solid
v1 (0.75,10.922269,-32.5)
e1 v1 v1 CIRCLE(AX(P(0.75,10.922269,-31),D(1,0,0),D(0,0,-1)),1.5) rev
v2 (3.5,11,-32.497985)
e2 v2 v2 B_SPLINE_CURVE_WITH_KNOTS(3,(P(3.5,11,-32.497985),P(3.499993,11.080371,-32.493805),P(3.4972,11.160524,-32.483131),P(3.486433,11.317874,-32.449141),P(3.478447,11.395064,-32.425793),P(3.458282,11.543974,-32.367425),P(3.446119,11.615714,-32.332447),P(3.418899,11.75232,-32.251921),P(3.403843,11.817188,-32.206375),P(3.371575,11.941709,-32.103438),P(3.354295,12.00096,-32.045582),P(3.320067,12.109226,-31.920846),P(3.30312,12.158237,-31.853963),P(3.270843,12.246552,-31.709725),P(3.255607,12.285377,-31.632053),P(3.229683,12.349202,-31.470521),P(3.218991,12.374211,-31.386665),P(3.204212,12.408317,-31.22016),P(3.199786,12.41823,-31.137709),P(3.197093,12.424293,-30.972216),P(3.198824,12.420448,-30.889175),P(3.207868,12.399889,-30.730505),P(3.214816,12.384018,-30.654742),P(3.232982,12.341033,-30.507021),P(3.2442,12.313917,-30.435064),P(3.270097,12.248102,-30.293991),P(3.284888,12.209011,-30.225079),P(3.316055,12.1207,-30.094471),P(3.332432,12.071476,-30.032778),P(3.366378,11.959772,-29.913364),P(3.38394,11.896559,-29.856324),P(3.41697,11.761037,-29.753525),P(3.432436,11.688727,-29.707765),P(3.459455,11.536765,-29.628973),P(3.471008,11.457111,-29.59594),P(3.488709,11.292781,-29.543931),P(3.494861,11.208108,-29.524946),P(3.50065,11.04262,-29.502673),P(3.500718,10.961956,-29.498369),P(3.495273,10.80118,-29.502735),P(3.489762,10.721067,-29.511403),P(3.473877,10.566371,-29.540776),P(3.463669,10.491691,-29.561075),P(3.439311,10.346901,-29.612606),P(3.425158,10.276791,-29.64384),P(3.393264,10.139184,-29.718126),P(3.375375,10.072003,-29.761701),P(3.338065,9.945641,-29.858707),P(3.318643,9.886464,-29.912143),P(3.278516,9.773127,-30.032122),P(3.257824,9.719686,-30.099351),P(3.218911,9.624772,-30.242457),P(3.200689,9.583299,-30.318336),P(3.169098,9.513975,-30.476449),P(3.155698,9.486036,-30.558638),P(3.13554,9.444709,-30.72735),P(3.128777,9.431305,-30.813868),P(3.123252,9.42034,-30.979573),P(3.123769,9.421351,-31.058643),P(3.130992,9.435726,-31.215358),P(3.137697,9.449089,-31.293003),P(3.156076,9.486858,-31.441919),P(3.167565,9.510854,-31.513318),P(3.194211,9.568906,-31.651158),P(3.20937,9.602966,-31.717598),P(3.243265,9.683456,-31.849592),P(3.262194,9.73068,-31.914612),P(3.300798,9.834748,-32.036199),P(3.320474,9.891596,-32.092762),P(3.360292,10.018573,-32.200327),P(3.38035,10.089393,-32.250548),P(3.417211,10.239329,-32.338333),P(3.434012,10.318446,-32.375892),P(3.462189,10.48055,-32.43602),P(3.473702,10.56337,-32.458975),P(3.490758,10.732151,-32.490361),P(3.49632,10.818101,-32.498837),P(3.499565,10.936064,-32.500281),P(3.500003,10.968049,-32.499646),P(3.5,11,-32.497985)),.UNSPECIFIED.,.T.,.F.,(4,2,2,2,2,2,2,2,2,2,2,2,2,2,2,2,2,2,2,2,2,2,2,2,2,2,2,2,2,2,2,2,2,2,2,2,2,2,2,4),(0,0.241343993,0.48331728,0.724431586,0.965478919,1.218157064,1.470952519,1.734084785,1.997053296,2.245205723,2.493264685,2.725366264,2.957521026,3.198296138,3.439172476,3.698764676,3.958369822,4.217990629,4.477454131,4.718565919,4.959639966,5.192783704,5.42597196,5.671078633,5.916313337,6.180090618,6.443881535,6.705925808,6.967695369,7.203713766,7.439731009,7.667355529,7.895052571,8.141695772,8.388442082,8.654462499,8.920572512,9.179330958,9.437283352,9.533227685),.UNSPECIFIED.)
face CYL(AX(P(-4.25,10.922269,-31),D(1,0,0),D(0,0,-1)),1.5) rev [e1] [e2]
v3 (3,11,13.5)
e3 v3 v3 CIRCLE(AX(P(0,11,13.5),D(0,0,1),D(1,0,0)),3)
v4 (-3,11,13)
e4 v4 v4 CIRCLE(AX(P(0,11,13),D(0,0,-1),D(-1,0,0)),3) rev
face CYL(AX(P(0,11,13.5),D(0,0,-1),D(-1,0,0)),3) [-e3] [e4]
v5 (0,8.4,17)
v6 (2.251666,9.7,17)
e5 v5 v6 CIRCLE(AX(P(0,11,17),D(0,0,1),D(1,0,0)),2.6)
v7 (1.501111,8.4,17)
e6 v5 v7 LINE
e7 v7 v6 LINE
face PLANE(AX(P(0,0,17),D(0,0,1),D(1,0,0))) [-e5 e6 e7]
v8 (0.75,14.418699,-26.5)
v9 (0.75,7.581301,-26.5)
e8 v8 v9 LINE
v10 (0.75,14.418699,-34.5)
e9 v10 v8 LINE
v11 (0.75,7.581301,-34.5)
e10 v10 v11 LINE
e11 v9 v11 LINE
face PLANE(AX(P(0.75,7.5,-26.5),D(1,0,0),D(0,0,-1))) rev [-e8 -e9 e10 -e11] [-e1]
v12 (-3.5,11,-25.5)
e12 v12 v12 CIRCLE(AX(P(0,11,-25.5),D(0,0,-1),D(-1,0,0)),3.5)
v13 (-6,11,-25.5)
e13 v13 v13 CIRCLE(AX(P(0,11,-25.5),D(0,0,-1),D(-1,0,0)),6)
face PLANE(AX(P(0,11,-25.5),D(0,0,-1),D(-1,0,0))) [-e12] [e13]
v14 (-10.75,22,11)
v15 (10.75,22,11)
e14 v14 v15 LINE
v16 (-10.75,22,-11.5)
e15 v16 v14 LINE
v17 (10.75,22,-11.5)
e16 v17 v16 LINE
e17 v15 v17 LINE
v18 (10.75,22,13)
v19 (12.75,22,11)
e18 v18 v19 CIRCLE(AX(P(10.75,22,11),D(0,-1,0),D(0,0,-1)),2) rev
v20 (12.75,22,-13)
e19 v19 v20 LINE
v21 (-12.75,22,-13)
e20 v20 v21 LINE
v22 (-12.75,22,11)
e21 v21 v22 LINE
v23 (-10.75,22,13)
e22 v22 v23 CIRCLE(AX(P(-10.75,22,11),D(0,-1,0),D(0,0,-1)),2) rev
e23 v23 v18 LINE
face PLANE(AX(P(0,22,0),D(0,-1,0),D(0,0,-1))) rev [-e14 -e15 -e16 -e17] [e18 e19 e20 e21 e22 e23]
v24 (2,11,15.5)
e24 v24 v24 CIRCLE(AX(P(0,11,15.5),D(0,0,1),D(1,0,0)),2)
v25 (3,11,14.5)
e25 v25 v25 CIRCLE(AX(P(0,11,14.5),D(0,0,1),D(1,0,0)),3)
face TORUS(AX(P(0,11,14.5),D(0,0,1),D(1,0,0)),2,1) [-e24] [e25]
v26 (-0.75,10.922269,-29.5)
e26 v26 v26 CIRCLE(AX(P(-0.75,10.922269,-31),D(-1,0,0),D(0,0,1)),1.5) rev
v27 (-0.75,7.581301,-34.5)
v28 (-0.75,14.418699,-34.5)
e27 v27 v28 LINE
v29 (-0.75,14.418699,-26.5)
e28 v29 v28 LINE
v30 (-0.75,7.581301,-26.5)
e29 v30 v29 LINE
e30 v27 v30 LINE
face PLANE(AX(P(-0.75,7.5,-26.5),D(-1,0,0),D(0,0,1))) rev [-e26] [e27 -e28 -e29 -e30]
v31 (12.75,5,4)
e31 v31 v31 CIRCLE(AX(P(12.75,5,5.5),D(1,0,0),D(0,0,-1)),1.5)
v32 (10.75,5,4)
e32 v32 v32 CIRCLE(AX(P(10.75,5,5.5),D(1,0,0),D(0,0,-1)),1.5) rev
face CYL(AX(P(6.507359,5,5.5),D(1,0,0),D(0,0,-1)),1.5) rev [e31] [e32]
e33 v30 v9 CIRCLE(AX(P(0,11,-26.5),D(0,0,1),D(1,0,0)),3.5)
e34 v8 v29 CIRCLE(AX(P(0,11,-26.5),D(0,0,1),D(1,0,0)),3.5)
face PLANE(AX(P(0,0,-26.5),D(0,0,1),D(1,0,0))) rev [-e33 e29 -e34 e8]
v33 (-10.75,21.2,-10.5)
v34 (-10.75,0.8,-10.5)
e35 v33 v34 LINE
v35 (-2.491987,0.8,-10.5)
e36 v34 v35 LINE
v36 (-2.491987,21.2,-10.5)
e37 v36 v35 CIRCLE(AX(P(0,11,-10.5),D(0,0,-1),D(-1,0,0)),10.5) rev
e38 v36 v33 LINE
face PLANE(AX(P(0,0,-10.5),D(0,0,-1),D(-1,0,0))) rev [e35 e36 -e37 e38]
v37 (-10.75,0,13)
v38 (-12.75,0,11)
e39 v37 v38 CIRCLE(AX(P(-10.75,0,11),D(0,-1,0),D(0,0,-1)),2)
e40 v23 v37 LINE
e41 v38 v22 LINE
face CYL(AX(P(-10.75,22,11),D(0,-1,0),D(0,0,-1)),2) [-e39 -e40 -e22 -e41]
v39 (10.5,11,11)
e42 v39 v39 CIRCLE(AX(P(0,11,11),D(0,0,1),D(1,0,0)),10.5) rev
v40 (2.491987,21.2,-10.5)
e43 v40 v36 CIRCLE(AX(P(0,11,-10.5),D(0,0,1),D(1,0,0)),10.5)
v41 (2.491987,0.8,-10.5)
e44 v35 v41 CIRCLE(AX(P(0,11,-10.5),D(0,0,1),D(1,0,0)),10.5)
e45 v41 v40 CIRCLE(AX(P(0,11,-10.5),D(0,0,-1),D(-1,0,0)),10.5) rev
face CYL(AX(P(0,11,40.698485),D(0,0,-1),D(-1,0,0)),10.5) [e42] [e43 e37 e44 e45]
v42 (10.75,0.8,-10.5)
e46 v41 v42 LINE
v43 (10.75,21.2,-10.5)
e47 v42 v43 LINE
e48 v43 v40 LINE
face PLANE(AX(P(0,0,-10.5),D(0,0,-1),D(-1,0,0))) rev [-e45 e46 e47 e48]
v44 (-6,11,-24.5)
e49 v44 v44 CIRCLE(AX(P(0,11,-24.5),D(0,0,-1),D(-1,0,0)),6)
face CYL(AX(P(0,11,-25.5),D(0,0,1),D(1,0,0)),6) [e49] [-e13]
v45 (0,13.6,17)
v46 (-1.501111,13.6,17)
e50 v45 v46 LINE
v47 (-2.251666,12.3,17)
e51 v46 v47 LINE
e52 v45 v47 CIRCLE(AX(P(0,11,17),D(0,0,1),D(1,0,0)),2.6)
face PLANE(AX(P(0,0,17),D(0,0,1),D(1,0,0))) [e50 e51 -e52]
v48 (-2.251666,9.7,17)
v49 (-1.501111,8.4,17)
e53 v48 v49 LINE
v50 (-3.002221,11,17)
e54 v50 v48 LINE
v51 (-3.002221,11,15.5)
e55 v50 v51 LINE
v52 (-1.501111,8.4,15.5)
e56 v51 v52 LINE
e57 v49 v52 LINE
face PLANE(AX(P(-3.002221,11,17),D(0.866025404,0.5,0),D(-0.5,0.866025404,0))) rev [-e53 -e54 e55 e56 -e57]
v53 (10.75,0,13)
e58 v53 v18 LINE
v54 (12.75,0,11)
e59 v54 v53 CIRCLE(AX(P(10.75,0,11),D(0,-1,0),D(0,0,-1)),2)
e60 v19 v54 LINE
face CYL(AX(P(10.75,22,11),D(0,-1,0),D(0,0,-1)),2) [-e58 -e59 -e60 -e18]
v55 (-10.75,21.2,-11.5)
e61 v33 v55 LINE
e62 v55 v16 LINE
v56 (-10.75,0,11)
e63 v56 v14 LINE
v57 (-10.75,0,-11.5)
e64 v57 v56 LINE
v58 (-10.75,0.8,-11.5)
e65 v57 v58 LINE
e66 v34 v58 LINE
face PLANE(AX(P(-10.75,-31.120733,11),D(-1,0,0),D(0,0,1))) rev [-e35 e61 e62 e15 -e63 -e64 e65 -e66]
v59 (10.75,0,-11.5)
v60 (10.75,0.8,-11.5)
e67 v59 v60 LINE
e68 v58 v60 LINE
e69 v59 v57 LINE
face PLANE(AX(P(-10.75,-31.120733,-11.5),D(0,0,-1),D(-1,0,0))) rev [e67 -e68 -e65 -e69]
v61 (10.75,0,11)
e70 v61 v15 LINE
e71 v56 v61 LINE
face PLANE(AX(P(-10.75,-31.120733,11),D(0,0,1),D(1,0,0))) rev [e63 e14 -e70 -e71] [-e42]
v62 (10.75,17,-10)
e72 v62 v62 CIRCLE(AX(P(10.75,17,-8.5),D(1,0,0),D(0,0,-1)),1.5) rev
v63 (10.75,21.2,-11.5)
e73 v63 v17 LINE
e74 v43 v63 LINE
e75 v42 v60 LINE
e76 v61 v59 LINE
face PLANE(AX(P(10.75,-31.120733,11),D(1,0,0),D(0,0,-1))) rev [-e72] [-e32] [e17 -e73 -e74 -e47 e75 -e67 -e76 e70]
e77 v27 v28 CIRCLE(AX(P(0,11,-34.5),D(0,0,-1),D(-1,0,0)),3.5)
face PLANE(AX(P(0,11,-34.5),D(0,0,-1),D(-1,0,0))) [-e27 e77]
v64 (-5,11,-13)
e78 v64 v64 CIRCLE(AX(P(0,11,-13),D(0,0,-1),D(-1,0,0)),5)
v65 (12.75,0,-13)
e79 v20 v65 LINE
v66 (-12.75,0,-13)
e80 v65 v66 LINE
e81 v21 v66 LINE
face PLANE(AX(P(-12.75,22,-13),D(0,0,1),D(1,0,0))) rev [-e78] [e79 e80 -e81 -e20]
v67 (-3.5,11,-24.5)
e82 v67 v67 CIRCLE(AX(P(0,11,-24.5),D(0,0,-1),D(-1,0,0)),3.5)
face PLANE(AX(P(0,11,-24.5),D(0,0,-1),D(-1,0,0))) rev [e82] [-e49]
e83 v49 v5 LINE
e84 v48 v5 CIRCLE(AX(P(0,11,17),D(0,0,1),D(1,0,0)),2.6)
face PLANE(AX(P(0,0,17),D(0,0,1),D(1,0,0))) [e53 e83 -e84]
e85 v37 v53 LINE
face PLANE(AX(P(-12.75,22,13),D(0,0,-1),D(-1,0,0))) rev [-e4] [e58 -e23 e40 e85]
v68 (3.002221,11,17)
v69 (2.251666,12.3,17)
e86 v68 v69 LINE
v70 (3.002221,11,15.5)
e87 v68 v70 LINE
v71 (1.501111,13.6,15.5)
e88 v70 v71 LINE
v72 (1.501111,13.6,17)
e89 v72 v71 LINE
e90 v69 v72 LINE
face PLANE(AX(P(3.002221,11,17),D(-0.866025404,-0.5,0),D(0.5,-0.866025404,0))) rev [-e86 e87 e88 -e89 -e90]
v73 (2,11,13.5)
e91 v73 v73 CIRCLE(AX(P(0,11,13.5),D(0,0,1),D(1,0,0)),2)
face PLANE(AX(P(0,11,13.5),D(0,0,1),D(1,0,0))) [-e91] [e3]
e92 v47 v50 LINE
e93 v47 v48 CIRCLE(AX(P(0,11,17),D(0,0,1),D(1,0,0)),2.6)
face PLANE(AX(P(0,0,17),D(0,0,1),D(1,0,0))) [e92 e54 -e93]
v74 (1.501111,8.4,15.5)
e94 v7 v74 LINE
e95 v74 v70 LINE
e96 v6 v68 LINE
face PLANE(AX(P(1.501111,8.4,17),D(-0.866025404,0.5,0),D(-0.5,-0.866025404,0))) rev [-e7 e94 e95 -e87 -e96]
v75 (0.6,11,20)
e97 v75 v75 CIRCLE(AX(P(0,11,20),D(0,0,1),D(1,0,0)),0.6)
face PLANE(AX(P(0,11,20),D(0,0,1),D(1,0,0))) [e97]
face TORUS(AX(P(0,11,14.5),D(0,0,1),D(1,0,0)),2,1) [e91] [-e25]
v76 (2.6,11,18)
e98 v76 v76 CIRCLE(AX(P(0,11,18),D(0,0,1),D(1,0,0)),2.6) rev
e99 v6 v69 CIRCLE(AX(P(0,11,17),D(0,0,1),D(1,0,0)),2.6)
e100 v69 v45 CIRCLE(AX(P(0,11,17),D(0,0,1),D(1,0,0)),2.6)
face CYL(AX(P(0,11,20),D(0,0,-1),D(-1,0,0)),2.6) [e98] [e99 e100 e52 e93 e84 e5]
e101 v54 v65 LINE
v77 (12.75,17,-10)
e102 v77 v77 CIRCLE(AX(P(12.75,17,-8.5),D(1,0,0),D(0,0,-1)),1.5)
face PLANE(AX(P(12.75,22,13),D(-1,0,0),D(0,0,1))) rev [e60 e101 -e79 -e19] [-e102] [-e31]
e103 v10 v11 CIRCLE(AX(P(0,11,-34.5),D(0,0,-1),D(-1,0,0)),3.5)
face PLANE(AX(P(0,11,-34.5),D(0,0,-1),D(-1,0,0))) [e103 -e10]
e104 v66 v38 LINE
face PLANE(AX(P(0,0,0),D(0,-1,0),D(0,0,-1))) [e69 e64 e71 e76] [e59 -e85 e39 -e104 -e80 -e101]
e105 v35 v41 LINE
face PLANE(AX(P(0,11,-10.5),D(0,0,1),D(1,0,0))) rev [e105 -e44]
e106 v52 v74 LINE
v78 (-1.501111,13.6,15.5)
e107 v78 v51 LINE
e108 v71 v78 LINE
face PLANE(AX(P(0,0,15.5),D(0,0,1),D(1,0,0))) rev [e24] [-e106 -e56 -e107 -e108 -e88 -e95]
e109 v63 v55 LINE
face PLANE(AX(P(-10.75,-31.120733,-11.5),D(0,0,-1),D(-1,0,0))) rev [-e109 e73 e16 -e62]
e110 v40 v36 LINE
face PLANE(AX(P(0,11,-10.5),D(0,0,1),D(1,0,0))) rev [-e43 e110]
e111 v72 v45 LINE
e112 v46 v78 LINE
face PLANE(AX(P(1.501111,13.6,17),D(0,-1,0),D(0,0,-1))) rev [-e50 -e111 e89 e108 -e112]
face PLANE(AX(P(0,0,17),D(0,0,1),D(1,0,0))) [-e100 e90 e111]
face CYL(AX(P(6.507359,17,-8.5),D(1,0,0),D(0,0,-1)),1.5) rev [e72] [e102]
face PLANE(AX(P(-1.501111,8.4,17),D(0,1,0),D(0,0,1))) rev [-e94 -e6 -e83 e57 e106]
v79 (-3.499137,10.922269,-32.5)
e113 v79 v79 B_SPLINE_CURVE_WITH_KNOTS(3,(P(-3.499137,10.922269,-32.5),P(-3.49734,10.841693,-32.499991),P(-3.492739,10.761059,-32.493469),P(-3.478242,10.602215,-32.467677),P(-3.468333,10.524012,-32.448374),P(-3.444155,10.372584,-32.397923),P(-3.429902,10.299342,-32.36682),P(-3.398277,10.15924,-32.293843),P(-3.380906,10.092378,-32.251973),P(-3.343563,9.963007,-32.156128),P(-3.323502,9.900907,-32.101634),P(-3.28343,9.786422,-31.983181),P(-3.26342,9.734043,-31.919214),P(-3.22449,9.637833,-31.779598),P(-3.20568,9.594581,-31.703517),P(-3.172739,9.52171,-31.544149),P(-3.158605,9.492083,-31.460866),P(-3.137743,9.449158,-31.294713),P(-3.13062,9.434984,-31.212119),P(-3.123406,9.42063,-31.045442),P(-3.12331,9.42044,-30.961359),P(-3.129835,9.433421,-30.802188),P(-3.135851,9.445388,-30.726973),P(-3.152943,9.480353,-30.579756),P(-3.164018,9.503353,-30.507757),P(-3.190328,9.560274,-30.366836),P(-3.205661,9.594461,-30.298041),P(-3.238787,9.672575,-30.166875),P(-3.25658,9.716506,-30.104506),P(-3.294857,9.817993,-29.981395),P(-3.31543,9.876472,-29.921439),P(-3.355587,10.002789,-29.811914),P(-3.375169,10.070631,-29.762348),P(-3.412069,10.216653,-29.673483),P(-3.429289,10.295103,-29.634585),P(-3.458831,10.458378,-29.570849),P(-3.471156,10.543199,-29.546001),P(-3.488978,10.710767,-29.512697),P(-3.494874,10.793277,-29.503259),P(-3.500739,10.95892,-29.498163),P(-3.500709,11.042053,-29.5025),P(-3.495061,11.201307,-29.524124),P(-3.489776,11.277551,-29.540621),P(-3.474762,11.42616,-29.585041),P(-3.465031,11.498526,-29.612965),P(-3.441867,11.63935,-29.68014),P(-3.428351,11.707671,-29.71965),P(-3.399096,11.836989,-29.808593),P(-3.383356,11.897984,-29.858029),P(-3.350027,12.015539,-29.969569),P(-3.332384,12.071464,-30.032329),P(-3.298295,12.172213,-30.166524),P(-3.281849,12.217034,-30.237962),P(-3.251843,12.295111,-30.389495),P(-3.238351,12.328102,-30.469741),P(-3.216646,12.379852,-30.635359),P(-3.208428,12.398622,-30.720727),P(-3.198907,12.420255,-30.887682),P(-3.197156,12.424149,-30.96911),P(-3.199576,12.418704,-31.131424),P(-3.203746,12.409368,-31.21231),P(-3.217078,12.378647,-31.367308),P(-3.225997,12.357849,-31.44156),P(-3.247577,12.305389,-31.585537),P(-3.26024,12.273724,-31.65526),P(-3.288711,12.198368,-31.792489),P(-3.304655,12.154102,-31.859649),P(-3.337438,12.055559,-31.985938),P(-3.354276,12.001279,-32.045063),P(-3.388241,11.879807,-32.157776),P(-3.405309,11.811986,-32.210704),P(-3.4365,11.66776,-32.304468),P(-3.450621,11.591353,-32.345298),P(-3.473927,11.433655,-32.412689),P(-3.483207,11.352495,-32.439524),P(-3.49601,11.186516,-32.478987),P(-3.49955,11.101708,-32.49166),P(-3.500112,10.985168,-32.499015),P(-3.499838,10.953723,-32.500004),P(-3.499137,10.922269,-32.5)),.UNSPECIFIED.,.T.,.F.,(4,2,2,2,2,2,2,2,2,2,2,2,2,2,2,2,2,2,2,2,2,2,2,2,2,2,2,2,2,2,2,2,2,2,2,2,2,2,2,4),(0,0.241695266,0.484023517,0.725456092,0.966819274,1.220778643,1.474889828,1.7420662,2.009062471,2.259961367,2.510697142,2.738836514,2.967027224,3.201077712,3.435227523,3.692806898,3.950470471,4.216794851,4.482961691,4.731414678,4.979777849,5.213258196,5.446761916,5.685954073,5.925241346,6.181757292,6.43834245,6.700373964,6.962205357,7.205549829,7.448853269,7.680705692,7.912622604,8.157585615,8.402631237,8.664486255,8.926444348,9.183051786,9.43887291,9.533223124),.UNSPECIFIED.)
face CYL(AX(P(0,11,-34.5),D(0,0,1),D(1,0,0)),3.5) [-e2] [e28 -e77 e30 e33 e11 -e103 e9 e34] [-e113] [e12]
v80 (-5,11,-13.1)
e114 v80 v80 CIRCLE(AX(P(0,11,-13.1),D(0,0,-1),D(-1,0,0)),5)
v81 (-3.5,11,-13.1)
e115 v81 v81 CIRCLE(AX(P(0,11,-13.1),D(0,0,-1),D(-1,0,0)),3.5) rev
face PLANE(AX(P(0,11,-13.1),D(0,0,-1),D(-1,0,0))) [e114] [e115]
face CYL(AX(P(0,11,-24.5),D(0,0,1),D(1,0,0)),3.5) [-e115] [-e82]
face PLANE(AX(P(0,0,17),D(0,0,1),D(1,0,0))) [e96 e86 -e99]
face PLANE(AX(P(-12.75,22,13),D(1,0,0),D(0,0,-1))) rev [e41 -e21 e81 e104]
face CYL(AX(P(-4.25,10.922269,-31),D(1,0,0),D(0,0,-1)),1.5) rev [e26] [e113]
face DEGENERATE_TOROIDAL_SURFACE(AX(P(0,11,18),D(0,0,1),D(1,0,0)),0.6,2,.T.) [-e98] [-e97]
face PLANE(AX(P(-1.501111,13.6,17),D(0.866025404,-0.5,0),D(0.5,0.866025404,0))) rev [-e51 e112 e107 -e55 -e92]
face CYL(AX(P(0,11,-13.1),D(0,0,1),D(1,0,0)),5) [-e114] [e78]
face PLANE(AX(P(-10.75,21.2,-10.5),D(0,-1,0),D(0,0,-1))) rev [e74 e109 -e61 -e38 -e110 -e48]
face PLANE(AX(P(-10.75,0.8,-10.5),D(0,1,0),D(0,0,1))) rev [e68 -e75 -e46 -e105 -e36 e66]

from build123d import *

# Parameters (mm, degrees)
SKETCH2_W               = 25.5
SKETCH2_H               = 26
BOSS_EXTRUDE1_DEPTH     = 22
FILLET1_R               = 2
SKETCH3_W               = 21.5
SKETCH3_H               = 22.5
CUT_EXTRUDE1_DEPTH      = 22
SKETCH4_W               = 21.5
SKETCH4_H               = 20.4
BOSS_EXTRUDE2_DEPTH     = 1
SKETCH5_R               = 10.5
BOSS_EXTRUDE3_DEPTH     = 21.5
SKETCH7_R               = 3
BOSS_EXTRUDE4_DEPTH     = 0.5
SKETCH8_R               = 3
BOSS_EXTRUDE5_DEPTH     = 2
SKETCH7_3_R             = 3
CUT_EXTRUDE2_DEPTH      = 0.5
FILLET2_R               = 1
FILLET3_R               = 1
SKETCH7_4_R             = 3
BOSS_EXTRUDE6_DEPTH     = 0.5
BOSS_EXTRUDE7_DEPTH     = 1.5
SKETCH10_R              = 2.6
BOSS_EXTRUDE8_DEPTH     = 3
FILLET4_R               = 2
SKETCH11_R              = 3.5
BOSS_EXTRUDE9_DEPTH     = 11.5
SKETCH12_R              = 6
BOSS_EXTRUDE10_DEPTH    = 1
SKETCH13_R              = 3.5
BOSS_EXTRUDE11_DEPTH    = 9
SKETCH15_W              = 1.5
SKETCH15_H              = 7
CUT_EXTRUDE3_DEPTH      = 8
CUT_EXTRUDE4_DEPTH      = 5
CUT_EXTRUDE4_DEPTH_BACK = 5
SKETCH16_R              = 1.5
SKETCH17_R              = 5
CUT_EXTRUDE5_DEPTH      = 2
SKETCH18_R              = 5
BOSS_EXTRUDE14_DEPTH    = 2.1
SKETCH19_R              = 1.5
CUT_EXTRUDE6_DEPTH      = 2


with BuildPart() as part:
    # Sketch2 → Boss-Extrude1 (new body)
    with BuildSketch(Plane(origin=(0, 0, 0), x_dir=(1, 0, 0), z_dir=(0, 1, 0))):
        Rectangle(SKETCH2_W, SKETCH2_H)
    extrude(amount=BOSS_EXTRUDE1_DEPTH)

    # Fillet1
    fillet1_edges = [part.edges().sort_by_distance(p)[0] for p in [
        (12.75, 11, 13),
        (-12.75, 11, 13),
    ]]
    fillet(fillet1_edges, radius=FILLET1_R)

    # Sketch3 → Cut-Extrude1 (cut)
    with BuildSketch(Plane(origin=(0, 22, 0), x_dir=(1, 0, 0), z_dir=(0, 1, 0))):
        with Locations((0, 0.25)):
            Rectangle(SKETCH3_W, SKETCH3_H)
    extrude(amount=-CUT_EXTRUDE1_DEPTH, mode=Mode.SUBTRACT)

    # Sketch4 → Boss-Extrude2 (add)
    with BuildSketch(Plane.XY.offset(-11.5)):
        with Locations((0, 11)):
            Rectangle(SKETCH4_W, SKETCH4_H)
    extrude(amount=BOSS_EXTRUDE2_DEPTH)

    # Sketch5 → Boss-Extrude3 (add)
    with BuildSketch(Plane.XY.offset(-10.5)):
        with Locations(Location((0, 11, 0), (0, 0, 256.270867325))):
            Circle(SKETCH5_R)
    extrude(amount=BOSS_EXTRUDE3_DEPTH)

    # Sketch7 → Boss-Extrude4 (add)
    with BuildSketch(Plane.XY.offset(13)):
        with Locations(Location((0, 11, 0), (0, 0, 180))):
            Circle(SKETCH7_R)
    extrude(amount=BOSS_EXTRUDE4_DEPTH)

    # Sketch8 → Boss-Extrude5 (add)
    with BuildSketch(Plane.XY.offset(13.5)):
        with Locations(Location((0, 11, 0), (0, 0, 180))):
            Circle(SKETCH8_R)
    extrude(amount=BOSS_EXTRUDE5_DEPTH)

    # Sketch7<3> → Cut-Extrude2 (cut)
    with BuildSketch(Plane.XY.offset(13)):
        with Locations((0, 11)):
            Circle(SKETCH7_3_R)
    extrude(amount=CUT_EXTRUDE2_DEPTH, mode=Mode.SUBTRACT)


with BuildPart() as cut_extrude2_piece_1:
    # of the separate pieces the step leaves, piece 1, a body of its own (cut_extrude2_pieces)
    add(part.part.solids().sort_by_distance((-10.75, 0, 13))[0])



with BuildPart() as cut_extrude2_piece_2:
    # of the separate pieces the step leaves, piece 2, a body of its own (cut_extrude2_pieces)
    add(part.part.solids().sort_by_distance((-3, 11, 13.5))[0])

    # Fillet2
    fillet2_edges = [cut_extrude2_piece_2.edges().sort_by_distance(p)[0] for p in [
        (3, 11, 13.5),
    ]]
    fillet(fillet2_edges, radius=FILLET2_R)

    # Fillet3
    fillet3_edges = [cut_extrude2_piece_2.edges().sort_by_distance(p)[0] for p in [
        (3, 11, 15.5),
    ]]
    fillet(fillet3_edges, radius=FILLET3_R - 0.0001)  # a hair under: the kernel refuses the full size


with BuildPart() as cut_extrude2_piece_1_1:
    add(cut_extrude2_piece_1.part)

    add(cut_extrude2_piece_2.part)  # Boss-Extrude6 merges Cut-Extrude2 piece 2
    # Sketch7<4> → Boss-Extrude6 (add)
    with BuildSketch(Plane.XY.offset(13)):
        with Locations(Location((0, 11, 0), (0, 0, 180))):
            Circle(SKETCH7_4_R)
    extrude(amount=BOSS_EXTRUDE6_DEPTH)

    # Sketch9 → Boss-Extrude7 (add)
    with BuildSketch(Plane.XY.offset(15.5)):
        Polygon((3.0022214, 11), (1.5011107, 13.6), (-1.5011107, 13.6), (-3.0022214, 11), (-1.5011107, 8.4), (1.5011107, 8.4), align=None)
    extrude(amount=BOSS_EXTRUDE7_DEPTH)

    # Sketch10 → Boss-Extrude8 (add)
    with BuildSketch(Plane.XY.offset(17)):
        with Locations(Location((0, 11, 0), (0, 0, 150))):
            Circle(SKETCH10_R)
    extrude(amount=BOSS_EXTRUDE8_DEPTH)

    # Fillet4
    fillet4_edges = [cut_extrude2_piece_1_1.edges().sort_by_distance(p)[0] for p in [
        (2.25166605, 9.7, 20),
    ]]
    fillet(fillet4_edges, radius=FILLET4_R)

    # Sketch11 → Boss-Extrude9 (add)
    with BuildSketch(Plane(origin=(0, 0, -13), x_dir=(-1, 0, 0), z_dir=(0, 0, -1))):
        with Locations((0, 11)):
            Circle(SKETCH11_R)
    extrude(amount=BOSS_EXTRUDE9_DEPTH)

    # Sketch12 → Boss-Extrude10 (add)
    with BuildSketch(Plane(origin=(0, 0, -24.5), x_dir=(-1, 0, 0), z_dir=(0, 0, -1))):
        with Locations((0, 11)):
            Circle(SKETCH12_R)
    extrude(amount=BOSS_EXTRUDE10_DEPTH)

    # Sketch13 → Boss-Extrude11 (add)
    with BuildSketch(Plane(origin=(0, 0, -25.5), x_dir=(-1, 0, 0), z_dir=(0, 0, -1))):
        with Locations((0, 11)):
            Circle(SKETCH13_R)
    extrude(amount=BOSS_EXTRUDE11_DEPTH)

    # Sketch15 → Cut-Extrude3 (cut)
    with BuildSketch(Plane(origin=(0, 0, -34.5), x_dir=(-1, 0, 0), z_dir=(0, 0, -1))):
        with Locations((0, 11)):
            Rectangle(SKETCH15_W, SKETCH15_H)
    extrude(amount=-CUT_EXTRUDE3_DEPTH, mode=Mode.SUBTRACT)

    # Sketch16 → Cut-Extrude4 (cut, two sides: drawn at the far end of the back side and taken through both)
    with BuildSketch(Plane.ZY.offset(-0.75).offset(-CUT_EXTRUDE4_DEPTH_BACK)):
        with Locations(Location((-31, 10.922268779, 0), (0, 0, 180))):
            Circle(SKETCH16_R)
    extrude(amount=CUT_EXTRUDE4_DEPTH + CUT_EXTRUDE4_DEPTH_BACK, mode=Mode.SUBTRACT)

    # Sketch17 → Cut-Extrude5 (cut)
    with BuildSketch(Plane(origin=(0, 0, -13), x_dir=(-1, 0, 0), z_dir=(0, 0, -1))):
        with Locations((0, 11)):
            Circle(SKETCH17_R)
    extrude(amount=-CUT_EXTRUDE5_DEPTH, mode=Mode.SUBTRACT)


with BuildPart() as cut_extrude5_piece_1:
    # of the separate pieces the step leaves, piece 1, a body of its own (cut_extrude5_pieces)
    add(cut_extrude2_piece_1_1.part.solids().sort_by_distance((12.75, 0, -13))[0])



with BuildPart() as cut_extrude5_piece_2:
    # of the separate pieces the step leaves, piece 2, a body of its own (cut_extrude5_pieces)
    add(cut_extrude2_piece_1_1.part.solids().sort_by_distance((-6, 11, -24.5))[0])


with BuildPart() as cut_extrude5_piece_1_1:
    add(cut_extrude5_piece_1.part)

    add(cut_extrude5_piece_2.part)  # Boss-Extrude14 merges Cut-Extrude5 piece 2
    # Sketch18 → Boss-Extrude14 (add)
    with BuildSketch(Plane(origin=(0, 0, -11), x_dir=(-1, 0, 0), z_dir=(0, 0, -1))):
        with Locations((0, 11)):
            Circle(SKETCH18_R)
    extrude(amount=BOSS_EXTRUDE14_DEPTH)

    # Sketch19 → Cut-Extrude6 (cut)
    with BuildSketch(Plane(origin=(12.75, 0, 0), x_dir=(0, 0, -1), z_dir=(1, 0, 0))):
        with Locations((-5.5, 5)):
            Circle(SKETCH19_R)
        with Locations((8.5, 17)):
            Circle(SKETCH19_R)
    extrude(amount=-CUT_EXTRUDE6_DEPTH, mode=Mode.SUBTRACT)


solid = cut_extrude5_piece_1_1.part
